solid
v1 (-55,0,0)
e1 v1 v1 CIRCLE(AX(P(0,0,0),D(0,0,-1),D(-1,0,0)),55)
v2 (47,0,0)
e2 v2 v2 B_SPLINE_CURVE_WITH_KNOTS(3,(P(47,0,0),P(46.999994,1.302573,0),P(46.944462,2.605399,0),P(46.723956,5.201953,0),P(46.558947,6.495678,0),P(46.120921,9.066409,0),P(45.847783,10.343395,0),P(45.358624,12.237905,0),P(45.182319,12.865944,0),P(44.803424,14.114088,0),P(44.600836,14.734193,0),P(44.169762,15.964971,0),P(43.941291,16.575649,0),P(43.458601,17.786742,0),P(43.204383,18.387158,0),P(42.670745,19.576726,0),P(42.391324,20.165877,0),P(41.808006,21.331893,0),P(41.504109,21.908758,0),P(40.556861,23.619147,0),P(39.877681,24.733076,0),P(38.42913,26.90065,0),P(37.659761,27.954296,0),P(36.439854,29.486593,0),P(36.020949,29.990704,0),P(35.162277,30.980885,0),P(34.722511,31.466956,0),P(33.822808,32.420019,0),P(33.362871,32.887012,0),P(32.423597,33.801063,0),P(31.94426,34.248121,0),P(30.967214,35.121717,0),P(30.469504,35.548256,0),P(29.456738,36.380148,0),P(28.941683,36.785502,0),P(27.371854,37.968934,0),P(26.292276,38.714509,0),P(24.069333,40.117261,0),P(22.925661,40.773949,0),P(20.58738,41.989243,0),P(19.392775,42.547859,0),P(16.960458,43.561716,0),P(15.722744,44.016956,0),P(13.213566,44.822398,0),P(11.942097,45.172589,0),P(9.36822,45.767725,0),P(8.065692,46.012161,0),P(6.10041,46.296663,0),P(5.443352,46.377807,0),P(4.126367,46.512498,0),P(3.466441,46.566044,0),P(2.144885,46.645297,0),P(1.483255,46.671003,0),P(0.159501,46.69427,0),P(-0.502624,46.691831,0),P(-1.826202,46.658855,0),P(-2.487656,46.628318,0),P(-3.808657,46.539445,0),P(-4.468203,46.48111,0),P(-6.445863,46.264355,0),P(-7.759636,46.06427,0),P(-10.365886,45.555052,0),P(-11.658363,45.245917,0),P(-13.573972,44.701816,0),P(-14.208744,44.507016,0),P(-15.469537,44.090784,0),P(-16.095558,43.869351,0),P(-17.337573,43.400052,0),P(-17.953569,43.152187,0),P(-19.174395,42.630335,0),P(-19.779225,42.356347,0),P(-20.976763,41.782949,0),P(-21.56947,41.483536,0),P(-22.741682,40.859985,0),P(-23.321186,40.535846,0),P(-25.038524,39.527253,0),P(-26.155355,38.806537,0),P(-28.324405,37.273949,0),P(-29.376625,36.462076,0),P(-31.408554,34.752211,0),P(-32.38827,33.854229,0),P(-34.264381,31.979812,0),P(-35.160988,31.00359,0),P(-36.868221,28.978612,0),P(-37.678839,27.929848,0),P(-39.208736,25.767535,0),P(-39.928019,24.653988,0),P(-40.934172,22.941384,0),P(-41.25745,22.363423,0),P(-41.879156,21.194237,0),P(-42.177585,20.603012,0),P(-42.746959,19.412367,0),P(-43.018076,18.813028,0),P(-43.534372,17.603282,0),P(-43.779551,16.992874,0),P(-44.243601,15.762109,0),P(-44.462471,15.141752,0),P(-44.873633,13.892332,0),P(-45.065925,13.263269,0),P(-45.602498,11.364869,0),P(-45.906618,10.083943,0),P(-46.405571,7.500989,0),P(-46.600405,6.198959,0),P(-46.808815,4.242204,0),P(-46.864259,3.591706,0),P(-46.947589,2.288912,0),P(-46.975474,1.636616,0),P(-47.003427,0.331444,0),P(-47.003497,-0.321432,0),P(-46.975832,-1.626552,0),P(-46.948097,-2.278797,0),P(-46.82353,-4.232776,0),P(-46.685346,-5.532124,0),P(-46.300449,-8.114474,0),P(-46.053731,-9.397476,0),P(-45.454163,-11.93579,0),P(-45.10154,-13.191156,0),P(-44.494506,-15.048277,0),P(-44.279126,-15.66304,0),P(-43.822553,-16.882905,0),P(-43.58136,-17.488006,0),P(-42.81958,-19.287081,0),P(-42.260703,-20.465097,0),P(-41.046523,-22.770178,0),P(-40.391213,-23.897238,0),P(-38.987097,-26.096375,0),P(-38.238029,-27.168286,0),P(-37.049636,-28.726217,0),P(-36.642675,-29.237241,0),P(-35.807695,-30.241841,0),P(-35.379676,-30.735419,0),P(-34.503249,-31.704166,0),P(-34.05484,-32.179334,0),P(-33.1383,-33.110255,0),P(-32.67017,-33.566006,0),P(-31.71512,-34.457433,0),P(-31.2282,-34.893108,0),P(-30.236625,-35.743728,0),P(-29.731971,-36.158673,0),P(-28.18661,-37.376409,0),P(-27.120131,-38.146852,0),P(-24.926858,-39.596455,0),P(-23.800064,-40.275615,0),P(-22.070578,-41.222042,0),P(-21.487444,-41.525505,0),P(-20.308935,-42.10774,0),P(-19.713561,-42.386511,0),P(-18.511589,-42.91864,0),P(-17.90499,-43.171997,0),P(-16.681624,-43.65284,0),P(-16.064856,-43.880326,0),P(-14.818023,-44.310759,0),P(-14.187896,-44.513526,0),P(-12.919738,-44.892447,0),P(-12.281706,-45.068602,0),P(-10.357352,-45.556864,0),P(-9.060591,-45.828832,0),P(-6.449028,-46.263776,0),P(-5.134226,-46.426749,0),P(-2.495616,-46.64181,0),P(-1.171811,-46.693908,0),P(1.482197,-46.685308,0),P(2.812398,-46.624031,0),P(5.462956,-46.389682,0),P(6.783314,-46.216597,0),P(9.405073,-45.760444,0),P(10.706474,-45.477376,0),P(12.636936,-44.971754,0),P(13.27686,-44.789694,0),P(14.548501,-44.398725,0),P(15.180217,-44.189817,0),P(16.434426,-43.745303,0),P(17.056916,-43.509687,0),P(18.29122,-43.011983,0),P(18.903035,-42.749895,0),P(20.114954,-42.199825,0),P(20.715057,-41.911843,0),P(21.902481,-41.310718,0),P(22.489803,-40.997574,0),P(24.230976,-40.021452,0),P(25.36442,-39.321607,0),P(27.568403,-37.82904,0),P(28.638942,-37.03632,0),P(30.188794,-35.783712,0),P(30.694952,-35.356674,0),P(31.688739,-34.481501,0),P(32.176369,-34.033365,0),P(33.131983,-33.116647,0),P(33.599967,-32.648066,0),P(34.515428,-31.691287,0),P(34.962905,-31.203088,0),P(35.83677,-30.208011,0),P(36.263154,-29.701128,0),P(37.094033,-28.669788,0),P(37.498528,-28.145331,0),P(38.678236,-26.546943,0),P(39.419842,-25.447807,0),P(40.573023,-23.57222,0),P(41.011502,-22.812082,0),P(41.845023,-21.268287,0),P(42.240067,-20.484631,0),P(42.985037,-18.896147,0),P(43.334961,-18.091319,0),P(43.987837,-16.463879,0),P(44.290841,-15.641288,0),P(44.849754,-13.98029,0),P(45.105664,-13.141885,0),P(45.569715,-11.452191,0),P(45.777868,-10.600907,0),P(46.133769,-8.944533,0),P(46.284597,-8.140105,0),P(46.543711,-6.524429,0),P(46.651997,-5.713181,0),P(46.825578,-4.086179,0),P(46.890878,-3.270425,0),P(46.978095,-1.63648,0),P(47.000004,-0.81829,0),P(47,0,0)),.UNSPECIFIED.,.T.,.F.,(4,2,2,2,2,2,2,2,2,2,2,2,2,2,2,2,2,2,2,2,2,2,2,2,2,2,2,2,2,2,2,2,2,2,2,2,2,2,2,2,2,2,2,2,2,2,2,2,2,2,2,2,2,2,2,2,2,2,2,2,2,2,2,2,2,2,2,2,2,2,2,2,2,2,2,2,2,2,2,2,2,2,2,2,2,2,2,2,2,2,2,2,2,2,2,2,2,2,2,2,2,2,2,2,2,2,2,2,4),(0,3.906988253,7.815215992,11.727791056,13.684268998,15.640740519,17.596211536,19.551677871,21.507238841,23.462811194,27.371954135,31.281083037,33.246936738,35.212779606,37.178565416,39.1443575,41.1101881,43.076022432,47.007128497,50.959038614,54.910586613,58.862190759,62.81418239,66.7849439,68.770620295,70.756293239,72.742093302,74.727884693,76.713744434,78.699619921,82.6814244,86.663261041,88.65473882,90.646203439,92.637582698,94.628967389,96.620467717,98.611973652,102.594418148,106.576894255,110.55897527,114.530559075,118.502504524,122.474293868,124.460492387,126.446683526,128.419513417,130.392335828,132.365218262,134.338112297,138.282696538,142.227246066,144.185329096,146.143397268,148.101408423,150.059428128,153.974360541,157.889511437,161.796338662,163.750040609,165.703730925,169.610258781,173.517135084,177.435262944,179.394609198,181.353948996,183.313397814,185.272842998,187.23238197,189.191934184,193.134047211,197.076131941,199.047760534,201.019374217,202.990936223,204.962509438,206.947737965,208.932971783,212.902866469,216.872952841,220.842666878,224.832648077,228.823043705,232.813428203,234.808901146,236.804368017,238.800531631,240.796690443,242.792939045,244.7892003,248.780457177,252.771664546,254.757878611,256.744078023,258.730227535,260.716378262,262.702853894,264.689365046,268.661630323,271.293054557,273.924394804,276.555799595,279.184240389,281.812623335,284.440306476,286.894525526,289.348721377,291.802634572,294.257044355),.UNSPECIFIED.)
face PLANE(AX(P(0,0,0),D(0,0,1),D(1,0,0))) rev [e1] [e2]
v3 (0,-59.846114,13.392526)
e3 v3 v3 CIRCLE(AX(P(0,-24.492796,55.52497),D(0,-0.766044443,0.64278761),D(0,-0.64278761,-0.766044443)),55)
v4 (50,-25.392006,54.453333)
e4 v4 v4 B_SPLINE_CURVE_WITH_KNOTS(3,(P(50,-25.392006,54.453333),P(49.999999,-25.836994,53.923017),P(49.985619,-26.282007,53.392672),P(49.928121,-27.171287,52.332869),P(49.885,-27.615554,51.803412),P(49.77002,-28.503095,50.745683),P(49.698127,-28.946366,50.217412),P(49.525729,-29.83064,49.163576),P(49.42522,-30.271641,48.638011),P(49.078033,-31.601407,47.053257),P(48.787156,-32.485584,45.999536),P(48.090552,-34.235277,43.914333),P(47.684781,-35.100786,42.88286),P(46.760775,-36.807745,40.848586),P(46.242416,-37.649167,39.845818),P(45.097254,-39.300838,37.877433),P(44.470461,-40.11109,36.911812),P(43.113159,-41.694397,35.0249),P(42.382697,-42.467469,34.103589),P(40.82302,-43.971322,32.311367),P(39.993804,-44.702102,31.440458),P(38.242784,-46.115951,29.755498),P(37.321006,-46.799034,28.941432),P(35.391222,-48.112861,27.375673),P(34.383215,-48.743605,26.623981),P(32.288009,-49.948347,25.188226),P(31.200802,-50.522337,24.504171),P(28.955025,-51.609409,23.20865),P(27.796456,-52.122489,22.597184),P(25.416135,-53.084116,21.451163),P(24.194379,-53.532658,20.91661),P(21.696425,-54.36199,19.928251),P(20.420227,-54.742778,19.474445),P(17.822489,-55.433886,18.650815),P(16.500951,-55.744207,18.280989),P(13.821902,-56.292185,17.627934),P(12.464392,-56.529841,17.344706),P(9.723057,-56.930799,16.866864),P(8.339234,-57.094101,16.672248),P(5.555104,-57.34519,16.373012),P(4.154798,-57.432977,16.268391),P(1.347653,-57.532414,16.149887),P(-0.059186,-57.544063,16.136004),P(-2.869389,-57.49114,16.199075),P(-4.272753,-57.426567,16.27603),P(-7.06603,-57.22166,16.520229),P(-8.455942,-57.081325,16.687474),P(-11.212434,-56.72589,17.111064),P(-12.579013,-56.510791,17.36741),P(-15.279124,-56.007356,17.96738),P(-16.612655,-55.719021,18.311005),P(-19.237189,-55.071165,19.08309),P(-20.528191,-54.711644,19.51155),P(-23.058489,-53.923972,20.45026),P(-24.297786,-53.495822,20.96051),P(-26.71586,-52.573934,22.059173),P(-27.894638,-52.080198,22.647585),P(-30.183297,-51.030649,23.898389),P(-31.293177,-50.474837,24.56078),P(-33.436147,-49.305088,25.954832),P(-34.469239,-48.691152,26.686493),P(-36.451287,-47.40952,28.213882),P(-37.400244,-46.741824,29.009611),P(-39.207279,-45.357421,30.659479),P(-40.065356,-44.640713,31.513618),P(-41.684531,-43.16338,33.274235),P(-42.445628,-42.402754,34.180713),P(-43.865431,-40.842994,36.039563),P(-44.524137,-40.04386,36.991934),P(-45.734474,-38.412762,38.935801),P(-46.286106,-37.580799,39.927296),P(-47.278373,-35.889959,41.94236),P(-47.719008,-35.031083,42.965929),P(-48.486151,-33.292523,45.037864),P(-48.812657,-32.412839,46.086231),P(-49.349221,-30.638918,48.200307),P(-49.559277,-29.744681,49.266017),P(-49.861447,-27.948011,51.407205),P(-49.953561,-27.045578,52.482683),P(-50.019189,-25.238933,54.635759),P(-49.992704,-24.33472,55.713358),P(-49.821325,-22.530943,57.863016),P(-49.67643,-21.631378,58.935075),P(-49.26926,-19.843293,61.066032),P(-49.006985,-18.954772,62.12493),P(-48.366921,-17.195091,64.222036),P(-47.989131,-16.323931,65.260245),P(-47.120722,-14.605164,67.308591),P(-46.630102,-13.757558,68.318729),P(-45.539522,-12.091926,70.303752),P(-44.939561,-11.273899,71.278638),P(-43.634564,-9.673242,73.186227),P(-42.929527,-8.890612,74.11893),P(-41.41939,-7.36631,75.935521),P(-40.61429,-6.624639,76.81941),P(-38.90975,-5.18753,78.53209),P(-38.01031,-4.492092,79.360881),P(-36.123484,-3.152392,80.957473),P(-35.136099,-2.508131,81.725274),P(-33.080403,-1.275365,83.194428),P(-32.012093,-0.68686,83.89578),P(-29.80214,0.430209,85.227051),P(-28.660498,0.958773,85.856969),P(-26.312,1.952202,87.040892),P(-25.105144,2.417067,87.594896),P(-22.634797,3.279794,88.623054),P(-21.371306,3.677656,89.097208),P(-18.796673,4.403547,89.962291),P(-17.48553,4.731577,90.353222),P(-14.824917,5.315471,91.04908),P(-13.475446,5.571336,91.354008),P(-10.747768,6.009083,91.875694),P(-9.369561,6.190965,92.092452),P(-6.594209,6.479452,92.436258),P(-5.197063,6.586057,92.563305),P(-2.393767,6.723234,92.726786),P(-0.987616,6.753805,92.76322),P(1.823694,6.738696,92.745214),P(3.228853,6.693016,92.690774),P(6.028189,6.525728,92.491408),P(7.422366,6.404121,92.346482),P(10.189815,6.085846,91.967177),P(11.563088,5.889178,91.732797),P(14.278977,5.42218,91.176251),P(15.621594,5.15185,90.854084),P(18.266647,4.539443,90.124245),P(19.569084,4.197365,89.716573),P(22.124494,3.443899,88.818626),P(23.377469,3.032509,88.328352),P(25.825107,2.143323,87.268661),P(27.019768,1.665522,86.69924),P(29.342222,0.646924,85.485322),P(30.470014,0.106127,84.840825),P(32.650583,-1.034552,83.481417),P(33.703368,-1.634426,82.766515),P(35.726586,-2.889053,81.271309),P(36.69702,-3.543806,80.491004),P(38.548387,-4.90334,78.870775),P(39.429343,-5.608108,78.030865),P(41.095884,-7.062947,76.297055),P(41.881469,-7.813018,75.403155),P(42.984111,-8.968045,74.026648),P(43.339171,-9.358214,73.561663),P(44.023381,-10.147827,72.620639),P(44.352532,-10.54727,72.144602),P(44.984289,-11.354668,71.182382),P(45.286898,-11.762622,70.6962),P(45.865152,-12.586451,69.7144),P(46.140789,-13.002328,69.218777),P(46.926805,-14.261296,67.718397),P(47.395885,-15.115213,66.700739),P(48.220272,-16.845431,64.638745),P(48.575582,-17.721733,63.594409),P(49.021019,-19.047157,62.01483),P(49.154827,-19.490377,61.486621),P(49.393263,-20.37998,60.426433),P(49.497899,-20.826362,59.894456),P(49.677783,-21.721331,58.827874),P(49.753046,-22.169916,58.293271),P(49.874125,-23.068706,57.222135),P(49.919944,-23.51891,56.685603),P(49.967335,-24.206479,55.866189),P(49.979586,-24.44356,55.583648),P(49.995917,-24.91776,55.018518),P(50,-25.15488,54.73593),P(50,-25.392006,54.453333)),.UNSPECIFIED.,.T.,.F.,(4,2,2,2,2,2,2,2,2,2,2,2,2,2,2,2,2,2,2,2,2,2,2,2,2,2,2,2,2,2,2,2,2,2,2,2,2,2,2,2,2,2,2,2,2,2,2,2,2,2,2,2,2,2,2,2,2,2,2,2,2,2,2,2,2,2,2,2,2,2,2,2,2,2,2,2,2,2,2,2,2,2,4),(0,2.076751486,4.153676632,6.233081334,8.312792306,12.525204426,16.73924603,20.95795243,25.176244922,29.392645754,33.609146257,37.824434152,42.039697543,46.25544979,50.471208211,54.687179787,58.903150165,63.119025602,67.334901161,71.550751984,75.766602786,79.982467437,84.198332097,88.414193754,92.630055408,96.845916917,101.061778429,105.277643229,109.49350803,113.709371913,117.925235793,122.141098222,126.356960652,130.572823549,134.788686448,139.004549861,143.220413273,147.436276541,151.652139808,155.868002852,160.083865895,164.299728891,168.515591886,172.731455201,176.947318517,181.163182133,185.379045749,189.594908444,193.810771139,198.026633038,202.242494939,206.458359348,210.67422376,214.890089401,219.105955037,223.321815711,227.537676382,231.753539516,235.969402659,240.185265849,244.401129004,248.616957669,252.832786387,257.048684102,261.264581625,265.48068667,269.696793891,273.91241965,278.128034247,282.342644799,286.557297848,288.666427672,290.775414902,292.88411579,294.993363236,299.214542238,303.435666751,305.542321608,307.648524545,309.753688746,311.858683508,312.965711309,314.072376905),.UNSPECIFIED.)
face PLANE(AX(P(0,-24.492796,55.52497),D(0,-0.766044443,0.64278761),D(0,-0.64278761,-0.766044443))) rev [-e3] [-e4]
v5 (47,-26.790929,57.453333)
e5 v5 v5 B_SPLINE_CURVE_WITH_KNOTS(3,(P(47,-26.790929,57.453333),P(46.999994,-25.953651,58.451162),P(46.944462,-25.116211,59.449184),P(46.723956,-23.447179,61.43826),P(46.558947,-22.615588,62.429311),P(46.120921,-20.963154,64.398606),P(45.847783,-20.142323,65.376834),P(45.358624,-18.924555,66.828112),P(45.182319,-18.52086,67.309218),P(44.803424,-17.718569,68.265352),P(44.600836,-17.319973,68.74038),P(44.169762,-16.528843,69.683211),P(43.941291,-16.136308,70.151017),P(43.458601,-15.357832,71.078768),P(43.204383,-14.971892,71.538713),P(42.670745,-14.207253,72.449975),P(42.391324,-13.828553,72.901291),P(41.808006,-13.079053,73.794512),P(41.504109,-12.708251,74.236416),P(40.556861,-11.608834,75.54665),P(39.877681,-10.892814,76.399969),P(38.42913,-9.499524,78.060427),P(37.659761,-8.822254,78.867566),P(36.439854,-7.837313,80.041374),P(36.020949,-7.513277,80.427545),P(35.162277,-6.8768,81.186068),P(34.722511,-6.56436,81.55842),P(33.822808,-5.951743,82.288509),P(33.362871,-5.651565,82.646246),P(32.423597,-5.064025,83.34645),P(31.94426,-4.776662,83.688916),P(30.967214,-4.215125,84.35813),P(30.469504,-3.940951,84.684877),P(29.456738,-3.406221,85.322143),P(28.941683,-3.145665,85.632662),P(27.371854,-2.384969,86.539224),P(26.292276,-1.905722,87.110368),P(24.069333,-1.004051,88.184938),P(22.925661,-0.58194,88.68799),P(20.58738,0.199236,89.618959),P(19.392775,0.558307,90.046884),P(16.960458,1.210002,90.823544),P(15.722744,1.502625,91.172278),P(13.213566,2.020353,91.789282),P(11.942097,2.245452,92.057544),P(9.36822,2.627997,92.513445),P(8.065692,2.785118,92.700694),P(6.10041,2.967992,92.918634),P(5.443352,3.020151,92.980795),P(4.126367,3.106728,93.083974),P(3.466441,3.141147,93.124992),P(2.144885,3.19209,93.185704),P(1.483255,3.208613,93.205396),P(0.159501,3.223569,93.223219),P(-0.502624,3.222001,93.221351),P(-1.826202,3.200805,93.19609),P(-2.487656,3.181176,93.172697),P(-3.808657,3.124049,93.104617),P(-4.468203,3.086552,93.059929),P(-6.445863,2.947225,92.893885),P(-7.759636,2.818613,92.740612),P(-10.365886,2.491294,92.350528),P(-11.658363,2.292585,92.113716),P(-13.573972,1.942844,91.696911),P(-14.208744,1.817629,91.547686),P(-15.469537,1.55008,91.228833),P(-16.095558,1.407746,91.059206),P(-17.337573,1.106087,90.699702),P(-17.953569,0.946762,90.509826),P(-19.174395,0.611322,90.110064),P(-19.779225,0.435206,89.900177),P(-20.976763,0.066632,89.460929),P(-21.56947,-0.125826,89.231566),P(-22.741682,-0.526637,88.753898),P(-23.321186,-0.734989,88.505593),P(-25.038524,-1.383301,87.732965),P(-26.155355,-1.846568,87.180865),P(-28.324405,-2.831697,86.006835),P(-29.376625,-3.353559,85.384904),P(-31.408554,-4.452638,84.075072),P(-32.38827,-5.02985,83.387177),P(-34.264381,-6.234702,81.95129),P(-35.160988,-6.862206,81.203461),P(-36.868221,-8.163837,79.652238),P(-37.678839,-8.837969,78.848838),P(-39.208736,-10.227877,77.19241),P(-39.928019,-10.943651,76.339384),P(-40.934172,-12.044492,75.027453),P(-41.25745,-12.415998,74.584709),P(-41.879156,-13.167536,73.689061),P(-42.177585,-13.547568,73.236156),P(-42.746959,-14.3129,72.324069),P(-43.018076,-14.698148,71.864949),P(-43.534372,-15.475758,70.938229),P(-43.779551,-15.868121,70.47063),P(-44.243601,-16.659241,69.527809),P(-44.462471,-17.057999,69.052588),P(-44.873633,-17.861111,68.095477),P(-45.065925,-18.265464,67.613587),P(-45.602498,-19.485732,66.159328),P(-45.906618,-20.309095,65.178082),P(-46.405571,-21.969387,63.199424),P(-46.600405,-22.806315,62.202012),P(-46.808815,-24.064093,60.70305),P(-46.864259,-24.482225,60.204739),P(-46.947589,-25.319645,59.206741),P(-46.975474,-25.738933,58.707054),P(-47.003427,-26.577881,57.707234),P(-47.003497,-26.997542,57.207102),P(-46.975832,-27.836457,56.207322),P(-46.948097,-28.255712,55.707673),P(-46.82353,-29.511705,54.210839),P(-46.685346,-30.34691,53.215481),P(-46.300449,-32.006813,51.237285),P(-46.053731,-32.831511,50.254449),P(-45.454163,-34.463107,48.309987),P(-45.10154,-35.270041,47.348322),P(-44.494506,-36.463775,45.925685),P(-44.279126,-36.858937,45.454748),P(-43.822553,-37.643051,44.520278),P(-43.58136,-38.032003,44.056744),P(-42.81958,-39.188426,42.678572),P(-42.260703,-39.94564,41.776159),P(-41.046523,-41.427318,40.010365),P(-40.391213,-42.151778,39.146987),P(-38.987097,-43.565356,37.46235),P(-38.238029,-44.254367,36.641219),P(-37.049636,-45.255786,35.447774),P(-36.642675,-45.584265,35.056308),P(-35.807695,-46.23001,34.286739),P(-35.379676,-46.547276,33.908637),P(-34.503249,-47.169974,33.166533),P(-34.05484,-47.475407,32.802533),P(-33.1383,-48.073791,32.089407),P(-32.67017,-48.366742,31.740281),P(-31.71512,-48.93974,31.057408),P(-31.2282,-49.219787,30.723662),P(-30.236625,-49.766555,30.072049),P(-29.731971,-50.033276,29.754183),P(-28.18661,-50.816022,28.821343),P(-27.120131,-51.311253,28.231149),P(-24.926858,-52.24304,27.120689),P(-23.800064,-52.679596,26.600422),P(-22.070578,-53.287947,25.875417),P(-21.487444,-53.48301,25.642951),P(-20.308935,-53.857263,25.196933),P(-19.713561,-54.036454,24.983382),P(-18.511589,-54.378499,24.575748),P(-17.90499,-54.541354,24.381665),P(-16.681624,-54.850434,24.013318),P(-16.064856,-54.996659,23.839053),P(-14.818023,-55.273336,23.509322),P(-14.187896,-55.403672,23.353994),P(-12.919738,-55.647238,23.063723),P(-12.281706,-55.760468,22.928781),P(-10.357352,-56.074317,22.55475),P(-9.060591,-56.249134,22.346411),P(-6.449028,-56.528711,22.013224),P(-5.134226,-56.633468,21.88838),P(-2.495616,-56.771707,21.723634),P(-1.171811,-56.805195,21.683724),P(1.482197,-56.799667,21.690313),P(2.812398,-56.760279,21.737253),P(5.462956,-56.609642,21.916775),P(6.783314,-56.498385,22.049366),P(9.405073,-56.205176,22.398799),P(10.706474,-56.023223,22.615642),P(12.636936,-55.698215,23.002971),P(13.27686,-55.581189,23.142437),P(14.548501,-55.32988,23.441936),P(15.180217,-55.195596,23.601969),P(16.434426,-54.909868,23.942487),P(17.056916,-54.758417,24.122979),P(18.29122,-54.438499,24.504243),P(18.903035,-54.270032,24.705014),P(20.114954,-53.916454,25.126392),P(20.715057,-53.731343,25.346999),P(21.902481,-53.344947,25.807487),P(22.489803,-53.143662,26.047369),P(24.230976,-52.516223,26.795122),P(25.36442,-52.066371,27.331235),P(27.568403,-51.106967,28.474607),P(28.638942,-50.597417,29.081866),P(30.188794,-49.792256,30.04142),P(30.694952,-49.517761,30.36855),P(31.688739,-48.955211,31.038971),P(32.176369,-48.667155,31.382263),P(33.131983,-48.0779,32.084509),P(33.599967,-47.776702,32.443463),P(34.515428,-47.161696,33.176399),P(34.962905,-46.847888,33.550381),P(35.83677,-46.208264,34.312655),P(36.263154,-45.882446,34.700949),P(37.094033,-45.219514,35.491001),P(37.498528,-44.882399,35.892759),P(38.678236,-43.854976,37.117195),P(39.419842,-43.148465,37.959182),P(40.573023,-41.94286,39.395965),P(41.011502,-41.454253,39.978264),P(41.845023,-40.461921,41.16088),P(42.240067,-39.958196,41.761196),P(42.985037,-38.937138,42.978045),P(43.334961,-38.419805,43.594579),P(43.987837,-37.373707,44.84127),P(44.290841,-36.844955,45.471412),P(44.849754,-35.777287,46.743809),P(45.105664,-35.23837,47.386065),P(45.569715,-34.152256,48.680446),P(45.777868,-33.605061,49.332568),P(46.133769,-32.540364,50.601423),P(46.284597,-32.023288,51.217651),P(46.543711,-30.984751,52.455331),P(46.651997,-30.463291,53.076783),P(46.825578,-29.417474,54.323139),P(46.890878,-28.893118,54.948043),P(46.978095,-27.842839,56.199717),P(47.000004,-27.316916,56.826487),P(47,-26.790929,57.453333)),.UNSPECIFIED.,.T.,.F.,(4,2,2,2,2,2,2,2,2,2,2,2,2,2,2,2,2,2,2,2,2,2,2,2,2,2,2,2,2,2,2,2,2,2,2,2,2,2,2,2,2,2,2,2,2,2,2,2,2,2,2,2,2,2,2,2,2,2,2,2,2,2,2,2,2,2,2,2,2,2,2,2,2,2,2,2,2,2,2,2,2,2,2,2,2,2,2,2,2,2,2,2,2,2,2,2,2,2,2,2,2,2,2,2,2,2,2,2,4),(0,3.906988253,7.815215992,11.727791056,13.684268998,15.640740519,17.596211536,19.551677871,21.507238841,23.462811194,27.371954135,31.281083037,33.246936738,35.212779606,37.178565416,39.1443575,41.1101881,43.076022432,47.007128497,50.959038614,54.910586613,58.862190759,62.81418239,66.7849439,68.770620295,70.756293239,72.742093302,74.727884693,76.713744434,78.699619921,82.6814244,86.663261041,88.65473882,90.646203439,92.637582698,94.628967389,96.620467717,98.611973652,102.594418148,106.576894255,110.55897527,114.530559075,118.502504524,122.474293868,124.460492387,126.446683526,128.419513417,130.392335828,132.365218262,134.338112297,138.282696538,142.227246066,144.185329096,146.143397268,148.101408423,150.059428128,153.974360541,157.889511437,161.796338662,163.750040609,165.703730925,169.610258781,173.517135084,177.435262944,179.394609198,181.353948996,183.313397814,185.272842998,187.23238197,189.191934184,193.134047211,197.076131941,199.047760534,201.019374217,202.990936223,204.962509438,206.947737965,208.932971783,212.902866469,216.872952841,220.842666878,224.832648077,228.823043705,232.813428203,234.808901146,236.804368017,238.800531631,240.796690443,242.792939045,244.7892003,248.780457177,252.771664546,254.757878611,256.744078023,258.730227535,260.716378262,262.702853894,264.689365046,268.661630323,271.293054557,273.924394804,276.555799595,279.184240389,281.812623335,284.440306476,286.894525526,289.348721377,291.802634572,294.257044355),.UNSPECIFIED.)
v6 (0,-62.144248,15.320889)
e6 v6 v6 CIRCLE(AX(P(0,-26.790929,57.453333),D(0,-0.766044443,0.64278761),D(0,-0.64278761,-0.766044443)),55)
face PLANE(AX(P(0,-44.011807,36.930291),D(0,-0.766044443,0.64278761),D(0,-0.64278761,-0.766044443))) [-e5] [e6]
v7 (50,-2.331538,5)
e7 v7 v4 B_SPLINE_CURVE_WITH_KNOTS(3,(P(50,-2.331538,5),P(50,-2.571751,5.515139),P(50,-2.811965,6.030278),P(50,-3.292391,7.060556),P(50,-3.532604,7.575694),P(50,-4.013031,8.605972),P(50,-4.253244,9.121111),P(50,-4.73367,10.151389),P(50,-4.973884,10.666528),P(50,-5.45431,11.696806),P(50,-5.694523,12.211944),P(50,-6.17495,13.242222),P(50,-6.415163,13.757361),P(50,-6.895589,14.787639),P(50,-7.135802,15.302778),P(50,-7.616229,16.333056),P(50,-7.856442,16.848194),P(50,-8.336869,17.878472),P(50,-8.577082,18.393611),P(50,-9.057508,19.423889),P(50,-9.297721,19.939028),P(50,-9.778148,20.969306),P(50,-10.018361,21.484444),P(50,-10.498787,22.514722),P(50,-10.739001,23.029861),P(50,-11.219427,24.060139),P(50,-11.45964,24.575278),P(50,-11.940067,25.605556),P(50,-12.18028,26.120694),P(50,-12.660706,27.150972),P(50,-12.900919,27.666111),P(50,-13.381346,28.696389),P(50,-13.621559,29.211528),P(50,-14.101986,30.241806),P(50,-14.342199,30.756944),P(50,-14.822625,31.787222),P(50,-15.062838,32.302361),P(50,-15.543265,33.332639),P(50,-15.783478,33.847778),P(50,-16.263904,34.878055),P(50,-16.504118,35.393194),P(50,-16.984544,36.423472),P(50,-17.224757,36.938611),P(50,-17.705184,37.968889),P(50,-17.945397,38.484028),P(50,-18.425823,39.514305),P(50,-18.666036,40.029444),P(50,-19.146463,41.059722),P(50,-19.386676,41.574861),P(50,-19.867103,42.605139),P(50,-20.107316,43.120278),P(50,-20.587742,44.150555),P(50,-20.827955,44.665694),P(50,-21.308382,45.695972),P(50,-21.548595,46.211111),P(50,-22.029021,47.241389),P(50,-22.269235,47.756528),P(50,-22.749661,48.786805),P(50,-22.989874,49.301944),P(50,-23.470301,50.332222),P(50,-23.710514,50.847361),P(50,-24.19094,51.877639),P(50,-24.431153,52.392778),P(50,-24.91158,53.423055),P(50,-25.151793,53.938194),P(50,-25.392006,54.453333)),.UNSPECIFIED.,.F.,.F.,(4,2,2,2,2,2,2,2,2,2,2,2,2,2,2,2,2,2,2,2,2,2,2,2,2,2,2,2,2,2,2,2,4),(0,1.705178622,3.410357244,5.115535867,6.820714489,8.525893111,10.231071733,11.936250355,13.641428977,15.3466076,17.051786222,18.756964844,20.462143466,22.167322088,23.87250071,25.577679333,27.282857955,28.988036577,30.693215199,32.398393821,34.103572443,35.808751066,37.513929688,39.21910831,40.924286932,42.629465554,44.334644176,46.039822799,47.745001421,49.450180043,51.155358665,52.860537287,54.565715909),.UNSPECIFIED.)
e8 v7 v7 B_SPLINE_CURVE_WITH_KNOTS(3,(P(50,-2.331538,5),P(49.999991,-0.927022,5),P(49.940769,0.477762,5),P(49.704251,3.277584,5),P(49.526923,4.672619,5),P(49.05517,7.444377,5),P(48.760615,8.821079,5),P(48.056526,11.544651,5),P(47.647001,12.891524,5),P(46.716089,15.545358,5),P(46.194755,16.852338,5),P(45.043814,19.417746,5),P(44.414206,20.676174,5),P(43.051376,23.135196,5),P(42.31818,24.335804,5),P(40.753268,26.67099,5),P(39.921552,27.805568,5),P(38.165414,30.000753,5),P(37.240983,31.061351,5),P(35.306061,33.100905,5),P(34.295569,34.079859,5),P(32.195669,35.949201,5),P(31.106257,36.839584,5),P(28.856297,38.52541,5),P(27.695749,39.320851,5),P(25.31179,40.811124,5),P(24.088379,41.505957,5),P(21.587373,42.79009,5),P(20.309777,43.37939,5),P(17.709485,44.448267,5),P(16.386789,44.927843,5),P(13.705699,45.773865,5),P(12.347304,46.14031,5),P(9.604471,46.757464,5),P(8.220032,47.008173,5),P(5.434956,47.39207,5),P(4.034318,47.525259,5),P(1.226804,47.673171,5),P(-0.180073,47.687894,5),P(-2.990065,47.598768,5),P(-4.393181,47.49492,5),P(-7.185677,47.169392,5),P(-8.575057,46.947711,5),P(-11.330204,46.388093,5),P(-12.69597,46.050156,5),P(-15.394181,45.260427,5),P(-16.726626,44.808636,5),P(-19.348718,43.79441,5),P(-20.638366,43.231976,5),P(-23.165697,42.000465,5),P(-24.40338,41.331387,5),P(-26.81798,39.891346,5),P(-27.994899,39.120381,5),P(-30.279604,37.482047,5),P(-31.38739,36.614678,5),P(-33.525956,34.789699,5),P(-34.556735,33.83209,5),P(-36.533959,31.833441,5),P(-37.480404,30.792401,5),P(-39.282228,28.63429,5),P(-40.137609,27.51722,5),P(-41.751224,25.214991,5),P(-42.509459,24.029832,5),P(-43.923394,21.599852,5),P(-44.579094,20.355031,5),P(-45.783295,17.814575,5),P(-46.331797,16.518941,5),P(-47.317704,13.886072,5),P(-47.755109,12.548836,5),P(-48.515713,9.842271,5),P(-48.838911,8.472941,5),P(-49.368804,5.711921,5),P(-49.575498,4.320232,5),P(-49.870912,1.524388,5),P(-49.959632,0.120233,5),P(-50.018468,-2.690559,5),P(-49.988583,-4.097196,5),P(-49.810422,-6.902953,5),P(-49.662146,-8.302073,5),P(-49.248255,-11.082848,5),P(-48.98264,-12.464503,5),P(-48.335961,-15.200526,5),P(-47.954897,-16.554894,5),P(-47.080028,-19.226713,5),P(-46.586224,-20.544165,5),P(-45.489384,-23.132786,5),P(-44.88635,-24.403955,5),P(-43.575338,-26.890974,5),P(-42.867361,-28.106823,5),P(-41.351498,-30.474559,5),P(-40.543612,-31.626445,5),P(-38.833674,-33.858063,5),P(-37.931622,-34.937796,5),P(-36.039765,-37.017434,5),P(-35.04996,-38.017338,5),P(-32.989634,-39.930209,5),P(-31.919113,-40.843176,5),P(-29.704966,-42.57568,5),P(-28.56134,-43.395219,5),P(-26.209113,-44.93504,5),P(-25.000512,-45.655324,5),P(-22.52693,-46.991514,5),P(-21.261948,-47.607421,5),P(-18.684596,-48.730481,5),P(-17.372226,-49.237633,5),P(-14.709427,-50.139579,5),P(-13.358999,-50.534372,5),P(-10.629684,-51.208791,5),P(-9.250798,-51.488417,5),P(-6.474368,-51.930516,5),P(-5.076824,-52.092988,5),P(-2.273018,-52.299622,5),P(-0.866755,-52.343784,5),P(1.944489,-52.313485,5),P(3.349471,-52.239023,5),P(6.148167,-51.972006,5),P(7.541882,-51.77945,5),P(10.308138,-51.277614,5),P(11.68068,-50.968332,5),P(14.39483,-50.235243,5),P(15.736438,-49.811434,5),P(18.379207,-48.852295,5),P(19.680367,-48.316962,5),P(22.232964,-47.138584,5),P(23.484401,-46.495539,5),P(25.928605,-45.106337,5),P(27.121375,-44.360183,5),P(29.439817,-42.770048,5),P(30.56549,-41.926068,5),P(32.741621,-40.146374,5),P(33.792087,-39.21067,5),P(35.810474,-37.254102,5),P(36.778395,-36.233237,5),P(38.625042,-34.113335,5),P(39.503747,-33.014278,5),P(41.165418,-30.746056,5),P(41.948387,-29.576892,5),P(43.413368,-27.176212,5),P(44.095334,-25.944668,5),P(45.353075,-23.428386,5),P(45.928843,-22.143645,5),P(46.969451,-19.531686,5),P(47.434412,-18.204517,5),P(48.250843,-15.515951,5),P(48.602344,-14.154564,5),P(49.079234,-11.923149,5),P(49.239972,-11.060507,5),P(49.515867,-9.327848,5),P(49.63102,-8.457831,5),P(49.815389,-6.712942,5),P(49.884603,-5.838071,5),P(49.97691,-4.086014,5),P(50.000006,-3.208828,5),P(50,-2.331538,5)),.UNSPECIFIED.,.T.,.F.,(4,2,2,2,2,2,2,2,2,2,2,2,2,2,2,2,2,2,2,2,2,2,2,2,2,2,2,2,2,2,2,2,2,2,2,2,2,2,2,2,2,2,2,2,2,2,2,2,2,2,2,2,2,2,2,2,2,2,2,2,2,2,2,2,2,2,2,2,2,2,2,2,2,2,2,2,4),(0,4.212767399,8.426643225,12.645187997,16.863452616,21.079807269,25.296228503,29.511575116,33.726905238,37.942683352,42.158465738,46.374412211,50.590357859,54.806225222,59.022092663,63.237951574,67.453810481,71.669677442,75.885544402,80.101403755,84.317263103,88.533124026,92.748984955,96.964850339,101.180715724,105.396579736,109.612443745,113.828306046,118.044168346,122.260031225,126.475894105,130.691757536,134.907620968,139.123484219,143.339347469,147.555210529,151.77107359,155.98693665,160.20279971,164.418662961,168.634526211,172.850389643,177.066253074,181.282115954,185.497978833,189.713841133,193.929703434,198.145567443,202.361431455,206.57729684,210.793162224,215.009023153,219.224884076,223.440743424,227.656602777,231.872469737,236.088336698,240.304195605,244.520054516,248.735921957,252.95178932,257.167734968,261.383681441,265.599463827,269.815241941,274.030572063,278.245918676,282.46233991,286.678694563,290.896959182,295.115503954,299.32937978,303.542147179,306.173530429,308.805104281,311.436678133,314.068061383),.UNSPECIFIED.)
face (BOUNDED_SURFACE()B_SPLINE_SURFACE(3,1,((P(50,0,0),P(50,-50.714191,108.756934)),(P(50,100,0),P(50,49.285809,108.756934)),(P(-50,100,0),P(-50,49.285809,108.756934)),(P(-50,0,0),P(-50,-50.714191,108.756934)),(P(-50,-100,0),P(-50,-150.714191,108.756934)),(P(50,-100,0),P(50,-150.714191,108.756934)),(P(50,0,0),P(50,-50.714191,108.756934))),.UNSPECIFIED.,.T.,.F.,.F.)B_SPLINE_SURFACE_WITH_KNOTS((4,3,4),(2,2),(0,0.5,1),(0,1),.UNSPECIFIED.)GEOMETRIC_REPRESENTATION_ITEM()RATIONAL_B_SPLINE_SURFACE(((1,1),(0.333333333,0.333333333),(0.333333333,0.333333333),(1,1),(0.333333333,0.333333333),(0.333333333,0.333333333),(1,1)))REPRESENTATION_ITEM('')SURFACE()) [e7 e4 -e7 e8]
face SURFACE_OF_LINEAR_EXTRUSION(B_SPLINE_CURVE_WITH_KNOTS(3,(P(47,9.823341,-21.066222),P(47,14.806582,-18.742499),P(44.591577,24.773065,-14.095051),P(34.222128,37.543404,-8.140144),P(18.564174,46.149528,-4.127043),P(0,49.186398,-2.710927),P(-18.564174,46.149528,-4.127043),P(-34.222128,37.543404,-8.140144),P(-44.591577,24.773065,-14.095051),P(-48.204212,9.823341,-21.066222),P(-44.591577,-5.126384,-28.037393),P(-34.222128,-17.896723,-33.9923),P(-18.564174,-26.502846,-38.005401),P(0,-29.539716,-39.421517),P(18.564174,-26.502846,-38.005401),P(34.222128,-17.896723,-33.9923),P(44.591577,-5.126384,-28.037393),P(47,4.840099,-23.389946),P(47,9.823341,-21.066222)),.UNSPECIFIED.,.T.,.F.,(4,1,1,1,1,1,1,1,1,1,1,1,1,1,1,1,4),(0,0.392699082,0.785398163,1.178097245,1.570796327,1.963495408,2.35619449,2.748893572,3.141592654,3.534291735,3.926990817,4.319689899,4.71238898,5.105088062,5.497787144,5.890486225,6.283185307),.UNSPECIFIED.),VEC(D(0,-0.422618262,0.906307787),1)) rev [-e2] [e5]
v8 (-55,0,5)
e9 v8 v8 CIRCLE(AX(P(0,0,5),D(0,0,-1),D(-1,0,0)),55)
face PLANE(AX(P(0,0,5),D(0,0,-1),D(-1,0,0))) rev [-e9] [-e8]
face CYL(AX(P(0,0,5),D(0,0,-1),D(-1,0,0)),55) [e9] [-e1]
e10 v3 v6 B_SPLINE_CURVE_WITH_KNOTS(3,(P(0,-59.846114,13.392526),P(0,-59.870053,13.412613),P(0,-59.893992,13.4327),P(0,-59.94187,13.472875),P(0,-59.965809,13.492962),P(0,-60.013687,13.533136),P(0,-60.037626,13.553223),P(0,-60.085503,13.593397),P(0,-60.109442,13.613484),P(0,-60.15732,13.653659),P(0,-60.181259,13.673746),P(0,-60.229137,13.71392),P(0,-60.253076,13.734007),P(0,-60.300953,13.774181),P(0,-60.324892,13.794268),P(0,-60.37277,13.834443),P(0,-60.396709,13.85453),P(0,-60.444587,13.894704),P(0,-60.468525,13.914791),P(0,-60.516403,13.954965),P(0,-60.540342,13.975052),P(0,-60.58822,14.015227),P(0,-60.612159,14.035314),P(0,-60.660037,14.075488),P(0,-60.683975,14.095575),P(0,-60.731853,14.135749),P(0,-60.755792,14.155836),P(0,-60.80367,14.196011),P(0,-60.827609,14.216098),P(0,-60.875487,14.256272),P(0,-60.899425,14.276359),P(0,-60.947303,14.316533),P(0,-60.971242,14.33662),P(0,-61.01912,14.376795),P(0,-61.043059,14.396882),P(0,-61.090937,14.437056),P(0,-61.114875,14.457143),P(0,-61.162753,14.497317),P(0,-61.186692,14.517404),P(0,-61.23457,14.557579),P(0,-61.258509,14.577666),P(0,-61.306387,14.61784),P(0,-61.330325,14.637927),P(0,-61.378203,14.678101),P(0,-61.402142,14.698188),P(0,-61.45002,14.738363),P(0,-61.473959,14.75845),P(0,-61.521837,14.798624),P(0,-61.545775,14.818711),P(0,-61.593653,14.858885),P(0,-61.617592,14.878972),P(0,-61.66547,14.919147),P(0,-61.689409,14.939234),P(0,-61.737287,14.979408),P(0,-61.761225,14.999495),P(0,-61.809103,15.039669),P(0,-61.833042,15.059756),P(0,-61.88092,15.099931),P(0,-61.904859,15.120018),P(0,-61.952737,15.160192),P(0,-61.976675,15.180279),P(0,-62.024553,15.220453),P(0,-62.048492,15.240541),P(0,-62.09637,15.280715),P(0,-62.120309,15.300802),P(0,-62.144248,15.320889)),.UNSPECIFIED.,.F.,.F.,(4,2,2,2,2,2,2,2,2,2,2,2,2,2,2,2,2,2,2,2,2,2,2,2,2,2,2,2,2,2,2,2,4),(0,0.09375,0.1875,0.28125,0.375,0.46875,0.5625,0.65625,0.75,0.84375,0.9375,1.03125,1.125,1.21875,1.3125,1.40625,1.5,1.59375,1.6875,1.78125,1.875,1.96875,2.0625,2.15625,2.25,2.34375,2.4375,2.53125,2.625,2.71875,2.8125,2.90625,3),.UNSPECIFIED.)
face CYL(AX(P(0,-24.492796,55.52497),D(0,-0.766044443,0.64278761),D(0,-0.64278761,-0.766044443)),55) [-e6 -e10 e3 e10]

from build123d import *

# Parameters (mm, degrees)
SKETCH1_R           = 50
SKETCH9_R           = 55
BOSS_EXTRUDE3_DEPTH = 5
SKETCH11_R          = 54.999999864
BOSS_EXTRUDE2_DEPTH = 3
CUT_EXTRUDE1_START  = -51.42835335
CUT_EXTRUDE1_DEPTH  = 102.8567067


with BuildPart() as part:
    # Sweep1: sweep along a path in Sketch3
    with BuildLine(Plane(origin=(0, 0, 0), x_dir=(0, 0, -1), z_dir=(1, 0, 0))) as sweep1_path:
        Line((0, 0), (-108.756934444, -50.714191409))
    # Sketch1 → Sweep1 (sweep)
    with BuildSketch(Plane.XY):
        Circle(SKETCH1_R)
    sweep(path=sweep1_path.line)

    # SurfaceCut3
    split(bisect_by=Plane(origin=(0, -44.011806663, 36.930290738), x_dir=(1, 0, 0), z_dir=(0, -0.7660444431189792, 0.6427876096865379)), keep=Keep.BOTTOM)

    # Sketch9 → Boss-Extrude3 (add)
    with BuildSketch(Plane(origin=(0, 0, 0), x_dir=(-1, 0, 0), z_dir=(0, 0, -1))):
        Circle(SKETCH9_R)
    extrude(amount=-BOSS_EXTRUDE3_DEPTH)

    # Sketch11 → Boss-Extrude2 (add)
    with BuildSketch(Plane(origin=(0, -44.011806663, 36.930290738), x_dir=(1, 0, 0), z_dir=(0, -0.7660444431189792, 0.6427876096865379))):
        with Locations(Location((0, 26.790929274, 0), (0, 0, 270))):
            Circle(SKETCH11_R)
    extrude(amount=-BOSS_EXTRUDE2_DEPTH)

    # Cut-Extrude1: read off the stored shape, not the designer's step
    # Cut-Extrude1 outline → Cut-Extrude1 (cut)
    with BuildSketch(Plane(origin=(0, -13.395464637, 28.726666617), x_dir=(1, 0, 0), z_dir=(0, -0.4226182617406939, 0.9063077870366526)).offset(CUT_EXTRUDE1_START)):
        with BuildLine():
            add(Edge.make_bspline(
                [(47, 0), (47, 5.498398611), (44.591576679, 16.495195833), (34.22212763, 30.585706168), (18.564174342, 40.081512496), (0, 43.43232778), (-18.564174342, 40.081512496), (-34.22212763, 30.585706168), (-44.591576679, 16.495195833), (-48.20421166, 0), (-44.591576679, -16.495195833), (-34.22212763, -30.585706168), (-18.564174342, -40.081512496), (0, -43.43232778), (18.564174342, -40.081512496), (34.22212763, -30.585706168), (44.591576679, -16.495195833), (47, -5.498398611), (47, 0)],
                knots=[0, 0, 0, 0, 0.392699082, 0.785398163, 1.178097245, 1.570796327, 1.963495408, 2.35619449, 2.748893572, 3.141592654, 3.534291735, 3.926990817, 4.319689899, 4.71238898, 5.105088062, 5.497787144, 5.890486225, 6.283185307, 6.283185307, 6.283185307, 6.283185307], degree=3))
        make_face()
    extrude(amount=CUT_EXTRUDE1_DEPTH, mode=Mode.SUBTRACT)


solid = part.part
